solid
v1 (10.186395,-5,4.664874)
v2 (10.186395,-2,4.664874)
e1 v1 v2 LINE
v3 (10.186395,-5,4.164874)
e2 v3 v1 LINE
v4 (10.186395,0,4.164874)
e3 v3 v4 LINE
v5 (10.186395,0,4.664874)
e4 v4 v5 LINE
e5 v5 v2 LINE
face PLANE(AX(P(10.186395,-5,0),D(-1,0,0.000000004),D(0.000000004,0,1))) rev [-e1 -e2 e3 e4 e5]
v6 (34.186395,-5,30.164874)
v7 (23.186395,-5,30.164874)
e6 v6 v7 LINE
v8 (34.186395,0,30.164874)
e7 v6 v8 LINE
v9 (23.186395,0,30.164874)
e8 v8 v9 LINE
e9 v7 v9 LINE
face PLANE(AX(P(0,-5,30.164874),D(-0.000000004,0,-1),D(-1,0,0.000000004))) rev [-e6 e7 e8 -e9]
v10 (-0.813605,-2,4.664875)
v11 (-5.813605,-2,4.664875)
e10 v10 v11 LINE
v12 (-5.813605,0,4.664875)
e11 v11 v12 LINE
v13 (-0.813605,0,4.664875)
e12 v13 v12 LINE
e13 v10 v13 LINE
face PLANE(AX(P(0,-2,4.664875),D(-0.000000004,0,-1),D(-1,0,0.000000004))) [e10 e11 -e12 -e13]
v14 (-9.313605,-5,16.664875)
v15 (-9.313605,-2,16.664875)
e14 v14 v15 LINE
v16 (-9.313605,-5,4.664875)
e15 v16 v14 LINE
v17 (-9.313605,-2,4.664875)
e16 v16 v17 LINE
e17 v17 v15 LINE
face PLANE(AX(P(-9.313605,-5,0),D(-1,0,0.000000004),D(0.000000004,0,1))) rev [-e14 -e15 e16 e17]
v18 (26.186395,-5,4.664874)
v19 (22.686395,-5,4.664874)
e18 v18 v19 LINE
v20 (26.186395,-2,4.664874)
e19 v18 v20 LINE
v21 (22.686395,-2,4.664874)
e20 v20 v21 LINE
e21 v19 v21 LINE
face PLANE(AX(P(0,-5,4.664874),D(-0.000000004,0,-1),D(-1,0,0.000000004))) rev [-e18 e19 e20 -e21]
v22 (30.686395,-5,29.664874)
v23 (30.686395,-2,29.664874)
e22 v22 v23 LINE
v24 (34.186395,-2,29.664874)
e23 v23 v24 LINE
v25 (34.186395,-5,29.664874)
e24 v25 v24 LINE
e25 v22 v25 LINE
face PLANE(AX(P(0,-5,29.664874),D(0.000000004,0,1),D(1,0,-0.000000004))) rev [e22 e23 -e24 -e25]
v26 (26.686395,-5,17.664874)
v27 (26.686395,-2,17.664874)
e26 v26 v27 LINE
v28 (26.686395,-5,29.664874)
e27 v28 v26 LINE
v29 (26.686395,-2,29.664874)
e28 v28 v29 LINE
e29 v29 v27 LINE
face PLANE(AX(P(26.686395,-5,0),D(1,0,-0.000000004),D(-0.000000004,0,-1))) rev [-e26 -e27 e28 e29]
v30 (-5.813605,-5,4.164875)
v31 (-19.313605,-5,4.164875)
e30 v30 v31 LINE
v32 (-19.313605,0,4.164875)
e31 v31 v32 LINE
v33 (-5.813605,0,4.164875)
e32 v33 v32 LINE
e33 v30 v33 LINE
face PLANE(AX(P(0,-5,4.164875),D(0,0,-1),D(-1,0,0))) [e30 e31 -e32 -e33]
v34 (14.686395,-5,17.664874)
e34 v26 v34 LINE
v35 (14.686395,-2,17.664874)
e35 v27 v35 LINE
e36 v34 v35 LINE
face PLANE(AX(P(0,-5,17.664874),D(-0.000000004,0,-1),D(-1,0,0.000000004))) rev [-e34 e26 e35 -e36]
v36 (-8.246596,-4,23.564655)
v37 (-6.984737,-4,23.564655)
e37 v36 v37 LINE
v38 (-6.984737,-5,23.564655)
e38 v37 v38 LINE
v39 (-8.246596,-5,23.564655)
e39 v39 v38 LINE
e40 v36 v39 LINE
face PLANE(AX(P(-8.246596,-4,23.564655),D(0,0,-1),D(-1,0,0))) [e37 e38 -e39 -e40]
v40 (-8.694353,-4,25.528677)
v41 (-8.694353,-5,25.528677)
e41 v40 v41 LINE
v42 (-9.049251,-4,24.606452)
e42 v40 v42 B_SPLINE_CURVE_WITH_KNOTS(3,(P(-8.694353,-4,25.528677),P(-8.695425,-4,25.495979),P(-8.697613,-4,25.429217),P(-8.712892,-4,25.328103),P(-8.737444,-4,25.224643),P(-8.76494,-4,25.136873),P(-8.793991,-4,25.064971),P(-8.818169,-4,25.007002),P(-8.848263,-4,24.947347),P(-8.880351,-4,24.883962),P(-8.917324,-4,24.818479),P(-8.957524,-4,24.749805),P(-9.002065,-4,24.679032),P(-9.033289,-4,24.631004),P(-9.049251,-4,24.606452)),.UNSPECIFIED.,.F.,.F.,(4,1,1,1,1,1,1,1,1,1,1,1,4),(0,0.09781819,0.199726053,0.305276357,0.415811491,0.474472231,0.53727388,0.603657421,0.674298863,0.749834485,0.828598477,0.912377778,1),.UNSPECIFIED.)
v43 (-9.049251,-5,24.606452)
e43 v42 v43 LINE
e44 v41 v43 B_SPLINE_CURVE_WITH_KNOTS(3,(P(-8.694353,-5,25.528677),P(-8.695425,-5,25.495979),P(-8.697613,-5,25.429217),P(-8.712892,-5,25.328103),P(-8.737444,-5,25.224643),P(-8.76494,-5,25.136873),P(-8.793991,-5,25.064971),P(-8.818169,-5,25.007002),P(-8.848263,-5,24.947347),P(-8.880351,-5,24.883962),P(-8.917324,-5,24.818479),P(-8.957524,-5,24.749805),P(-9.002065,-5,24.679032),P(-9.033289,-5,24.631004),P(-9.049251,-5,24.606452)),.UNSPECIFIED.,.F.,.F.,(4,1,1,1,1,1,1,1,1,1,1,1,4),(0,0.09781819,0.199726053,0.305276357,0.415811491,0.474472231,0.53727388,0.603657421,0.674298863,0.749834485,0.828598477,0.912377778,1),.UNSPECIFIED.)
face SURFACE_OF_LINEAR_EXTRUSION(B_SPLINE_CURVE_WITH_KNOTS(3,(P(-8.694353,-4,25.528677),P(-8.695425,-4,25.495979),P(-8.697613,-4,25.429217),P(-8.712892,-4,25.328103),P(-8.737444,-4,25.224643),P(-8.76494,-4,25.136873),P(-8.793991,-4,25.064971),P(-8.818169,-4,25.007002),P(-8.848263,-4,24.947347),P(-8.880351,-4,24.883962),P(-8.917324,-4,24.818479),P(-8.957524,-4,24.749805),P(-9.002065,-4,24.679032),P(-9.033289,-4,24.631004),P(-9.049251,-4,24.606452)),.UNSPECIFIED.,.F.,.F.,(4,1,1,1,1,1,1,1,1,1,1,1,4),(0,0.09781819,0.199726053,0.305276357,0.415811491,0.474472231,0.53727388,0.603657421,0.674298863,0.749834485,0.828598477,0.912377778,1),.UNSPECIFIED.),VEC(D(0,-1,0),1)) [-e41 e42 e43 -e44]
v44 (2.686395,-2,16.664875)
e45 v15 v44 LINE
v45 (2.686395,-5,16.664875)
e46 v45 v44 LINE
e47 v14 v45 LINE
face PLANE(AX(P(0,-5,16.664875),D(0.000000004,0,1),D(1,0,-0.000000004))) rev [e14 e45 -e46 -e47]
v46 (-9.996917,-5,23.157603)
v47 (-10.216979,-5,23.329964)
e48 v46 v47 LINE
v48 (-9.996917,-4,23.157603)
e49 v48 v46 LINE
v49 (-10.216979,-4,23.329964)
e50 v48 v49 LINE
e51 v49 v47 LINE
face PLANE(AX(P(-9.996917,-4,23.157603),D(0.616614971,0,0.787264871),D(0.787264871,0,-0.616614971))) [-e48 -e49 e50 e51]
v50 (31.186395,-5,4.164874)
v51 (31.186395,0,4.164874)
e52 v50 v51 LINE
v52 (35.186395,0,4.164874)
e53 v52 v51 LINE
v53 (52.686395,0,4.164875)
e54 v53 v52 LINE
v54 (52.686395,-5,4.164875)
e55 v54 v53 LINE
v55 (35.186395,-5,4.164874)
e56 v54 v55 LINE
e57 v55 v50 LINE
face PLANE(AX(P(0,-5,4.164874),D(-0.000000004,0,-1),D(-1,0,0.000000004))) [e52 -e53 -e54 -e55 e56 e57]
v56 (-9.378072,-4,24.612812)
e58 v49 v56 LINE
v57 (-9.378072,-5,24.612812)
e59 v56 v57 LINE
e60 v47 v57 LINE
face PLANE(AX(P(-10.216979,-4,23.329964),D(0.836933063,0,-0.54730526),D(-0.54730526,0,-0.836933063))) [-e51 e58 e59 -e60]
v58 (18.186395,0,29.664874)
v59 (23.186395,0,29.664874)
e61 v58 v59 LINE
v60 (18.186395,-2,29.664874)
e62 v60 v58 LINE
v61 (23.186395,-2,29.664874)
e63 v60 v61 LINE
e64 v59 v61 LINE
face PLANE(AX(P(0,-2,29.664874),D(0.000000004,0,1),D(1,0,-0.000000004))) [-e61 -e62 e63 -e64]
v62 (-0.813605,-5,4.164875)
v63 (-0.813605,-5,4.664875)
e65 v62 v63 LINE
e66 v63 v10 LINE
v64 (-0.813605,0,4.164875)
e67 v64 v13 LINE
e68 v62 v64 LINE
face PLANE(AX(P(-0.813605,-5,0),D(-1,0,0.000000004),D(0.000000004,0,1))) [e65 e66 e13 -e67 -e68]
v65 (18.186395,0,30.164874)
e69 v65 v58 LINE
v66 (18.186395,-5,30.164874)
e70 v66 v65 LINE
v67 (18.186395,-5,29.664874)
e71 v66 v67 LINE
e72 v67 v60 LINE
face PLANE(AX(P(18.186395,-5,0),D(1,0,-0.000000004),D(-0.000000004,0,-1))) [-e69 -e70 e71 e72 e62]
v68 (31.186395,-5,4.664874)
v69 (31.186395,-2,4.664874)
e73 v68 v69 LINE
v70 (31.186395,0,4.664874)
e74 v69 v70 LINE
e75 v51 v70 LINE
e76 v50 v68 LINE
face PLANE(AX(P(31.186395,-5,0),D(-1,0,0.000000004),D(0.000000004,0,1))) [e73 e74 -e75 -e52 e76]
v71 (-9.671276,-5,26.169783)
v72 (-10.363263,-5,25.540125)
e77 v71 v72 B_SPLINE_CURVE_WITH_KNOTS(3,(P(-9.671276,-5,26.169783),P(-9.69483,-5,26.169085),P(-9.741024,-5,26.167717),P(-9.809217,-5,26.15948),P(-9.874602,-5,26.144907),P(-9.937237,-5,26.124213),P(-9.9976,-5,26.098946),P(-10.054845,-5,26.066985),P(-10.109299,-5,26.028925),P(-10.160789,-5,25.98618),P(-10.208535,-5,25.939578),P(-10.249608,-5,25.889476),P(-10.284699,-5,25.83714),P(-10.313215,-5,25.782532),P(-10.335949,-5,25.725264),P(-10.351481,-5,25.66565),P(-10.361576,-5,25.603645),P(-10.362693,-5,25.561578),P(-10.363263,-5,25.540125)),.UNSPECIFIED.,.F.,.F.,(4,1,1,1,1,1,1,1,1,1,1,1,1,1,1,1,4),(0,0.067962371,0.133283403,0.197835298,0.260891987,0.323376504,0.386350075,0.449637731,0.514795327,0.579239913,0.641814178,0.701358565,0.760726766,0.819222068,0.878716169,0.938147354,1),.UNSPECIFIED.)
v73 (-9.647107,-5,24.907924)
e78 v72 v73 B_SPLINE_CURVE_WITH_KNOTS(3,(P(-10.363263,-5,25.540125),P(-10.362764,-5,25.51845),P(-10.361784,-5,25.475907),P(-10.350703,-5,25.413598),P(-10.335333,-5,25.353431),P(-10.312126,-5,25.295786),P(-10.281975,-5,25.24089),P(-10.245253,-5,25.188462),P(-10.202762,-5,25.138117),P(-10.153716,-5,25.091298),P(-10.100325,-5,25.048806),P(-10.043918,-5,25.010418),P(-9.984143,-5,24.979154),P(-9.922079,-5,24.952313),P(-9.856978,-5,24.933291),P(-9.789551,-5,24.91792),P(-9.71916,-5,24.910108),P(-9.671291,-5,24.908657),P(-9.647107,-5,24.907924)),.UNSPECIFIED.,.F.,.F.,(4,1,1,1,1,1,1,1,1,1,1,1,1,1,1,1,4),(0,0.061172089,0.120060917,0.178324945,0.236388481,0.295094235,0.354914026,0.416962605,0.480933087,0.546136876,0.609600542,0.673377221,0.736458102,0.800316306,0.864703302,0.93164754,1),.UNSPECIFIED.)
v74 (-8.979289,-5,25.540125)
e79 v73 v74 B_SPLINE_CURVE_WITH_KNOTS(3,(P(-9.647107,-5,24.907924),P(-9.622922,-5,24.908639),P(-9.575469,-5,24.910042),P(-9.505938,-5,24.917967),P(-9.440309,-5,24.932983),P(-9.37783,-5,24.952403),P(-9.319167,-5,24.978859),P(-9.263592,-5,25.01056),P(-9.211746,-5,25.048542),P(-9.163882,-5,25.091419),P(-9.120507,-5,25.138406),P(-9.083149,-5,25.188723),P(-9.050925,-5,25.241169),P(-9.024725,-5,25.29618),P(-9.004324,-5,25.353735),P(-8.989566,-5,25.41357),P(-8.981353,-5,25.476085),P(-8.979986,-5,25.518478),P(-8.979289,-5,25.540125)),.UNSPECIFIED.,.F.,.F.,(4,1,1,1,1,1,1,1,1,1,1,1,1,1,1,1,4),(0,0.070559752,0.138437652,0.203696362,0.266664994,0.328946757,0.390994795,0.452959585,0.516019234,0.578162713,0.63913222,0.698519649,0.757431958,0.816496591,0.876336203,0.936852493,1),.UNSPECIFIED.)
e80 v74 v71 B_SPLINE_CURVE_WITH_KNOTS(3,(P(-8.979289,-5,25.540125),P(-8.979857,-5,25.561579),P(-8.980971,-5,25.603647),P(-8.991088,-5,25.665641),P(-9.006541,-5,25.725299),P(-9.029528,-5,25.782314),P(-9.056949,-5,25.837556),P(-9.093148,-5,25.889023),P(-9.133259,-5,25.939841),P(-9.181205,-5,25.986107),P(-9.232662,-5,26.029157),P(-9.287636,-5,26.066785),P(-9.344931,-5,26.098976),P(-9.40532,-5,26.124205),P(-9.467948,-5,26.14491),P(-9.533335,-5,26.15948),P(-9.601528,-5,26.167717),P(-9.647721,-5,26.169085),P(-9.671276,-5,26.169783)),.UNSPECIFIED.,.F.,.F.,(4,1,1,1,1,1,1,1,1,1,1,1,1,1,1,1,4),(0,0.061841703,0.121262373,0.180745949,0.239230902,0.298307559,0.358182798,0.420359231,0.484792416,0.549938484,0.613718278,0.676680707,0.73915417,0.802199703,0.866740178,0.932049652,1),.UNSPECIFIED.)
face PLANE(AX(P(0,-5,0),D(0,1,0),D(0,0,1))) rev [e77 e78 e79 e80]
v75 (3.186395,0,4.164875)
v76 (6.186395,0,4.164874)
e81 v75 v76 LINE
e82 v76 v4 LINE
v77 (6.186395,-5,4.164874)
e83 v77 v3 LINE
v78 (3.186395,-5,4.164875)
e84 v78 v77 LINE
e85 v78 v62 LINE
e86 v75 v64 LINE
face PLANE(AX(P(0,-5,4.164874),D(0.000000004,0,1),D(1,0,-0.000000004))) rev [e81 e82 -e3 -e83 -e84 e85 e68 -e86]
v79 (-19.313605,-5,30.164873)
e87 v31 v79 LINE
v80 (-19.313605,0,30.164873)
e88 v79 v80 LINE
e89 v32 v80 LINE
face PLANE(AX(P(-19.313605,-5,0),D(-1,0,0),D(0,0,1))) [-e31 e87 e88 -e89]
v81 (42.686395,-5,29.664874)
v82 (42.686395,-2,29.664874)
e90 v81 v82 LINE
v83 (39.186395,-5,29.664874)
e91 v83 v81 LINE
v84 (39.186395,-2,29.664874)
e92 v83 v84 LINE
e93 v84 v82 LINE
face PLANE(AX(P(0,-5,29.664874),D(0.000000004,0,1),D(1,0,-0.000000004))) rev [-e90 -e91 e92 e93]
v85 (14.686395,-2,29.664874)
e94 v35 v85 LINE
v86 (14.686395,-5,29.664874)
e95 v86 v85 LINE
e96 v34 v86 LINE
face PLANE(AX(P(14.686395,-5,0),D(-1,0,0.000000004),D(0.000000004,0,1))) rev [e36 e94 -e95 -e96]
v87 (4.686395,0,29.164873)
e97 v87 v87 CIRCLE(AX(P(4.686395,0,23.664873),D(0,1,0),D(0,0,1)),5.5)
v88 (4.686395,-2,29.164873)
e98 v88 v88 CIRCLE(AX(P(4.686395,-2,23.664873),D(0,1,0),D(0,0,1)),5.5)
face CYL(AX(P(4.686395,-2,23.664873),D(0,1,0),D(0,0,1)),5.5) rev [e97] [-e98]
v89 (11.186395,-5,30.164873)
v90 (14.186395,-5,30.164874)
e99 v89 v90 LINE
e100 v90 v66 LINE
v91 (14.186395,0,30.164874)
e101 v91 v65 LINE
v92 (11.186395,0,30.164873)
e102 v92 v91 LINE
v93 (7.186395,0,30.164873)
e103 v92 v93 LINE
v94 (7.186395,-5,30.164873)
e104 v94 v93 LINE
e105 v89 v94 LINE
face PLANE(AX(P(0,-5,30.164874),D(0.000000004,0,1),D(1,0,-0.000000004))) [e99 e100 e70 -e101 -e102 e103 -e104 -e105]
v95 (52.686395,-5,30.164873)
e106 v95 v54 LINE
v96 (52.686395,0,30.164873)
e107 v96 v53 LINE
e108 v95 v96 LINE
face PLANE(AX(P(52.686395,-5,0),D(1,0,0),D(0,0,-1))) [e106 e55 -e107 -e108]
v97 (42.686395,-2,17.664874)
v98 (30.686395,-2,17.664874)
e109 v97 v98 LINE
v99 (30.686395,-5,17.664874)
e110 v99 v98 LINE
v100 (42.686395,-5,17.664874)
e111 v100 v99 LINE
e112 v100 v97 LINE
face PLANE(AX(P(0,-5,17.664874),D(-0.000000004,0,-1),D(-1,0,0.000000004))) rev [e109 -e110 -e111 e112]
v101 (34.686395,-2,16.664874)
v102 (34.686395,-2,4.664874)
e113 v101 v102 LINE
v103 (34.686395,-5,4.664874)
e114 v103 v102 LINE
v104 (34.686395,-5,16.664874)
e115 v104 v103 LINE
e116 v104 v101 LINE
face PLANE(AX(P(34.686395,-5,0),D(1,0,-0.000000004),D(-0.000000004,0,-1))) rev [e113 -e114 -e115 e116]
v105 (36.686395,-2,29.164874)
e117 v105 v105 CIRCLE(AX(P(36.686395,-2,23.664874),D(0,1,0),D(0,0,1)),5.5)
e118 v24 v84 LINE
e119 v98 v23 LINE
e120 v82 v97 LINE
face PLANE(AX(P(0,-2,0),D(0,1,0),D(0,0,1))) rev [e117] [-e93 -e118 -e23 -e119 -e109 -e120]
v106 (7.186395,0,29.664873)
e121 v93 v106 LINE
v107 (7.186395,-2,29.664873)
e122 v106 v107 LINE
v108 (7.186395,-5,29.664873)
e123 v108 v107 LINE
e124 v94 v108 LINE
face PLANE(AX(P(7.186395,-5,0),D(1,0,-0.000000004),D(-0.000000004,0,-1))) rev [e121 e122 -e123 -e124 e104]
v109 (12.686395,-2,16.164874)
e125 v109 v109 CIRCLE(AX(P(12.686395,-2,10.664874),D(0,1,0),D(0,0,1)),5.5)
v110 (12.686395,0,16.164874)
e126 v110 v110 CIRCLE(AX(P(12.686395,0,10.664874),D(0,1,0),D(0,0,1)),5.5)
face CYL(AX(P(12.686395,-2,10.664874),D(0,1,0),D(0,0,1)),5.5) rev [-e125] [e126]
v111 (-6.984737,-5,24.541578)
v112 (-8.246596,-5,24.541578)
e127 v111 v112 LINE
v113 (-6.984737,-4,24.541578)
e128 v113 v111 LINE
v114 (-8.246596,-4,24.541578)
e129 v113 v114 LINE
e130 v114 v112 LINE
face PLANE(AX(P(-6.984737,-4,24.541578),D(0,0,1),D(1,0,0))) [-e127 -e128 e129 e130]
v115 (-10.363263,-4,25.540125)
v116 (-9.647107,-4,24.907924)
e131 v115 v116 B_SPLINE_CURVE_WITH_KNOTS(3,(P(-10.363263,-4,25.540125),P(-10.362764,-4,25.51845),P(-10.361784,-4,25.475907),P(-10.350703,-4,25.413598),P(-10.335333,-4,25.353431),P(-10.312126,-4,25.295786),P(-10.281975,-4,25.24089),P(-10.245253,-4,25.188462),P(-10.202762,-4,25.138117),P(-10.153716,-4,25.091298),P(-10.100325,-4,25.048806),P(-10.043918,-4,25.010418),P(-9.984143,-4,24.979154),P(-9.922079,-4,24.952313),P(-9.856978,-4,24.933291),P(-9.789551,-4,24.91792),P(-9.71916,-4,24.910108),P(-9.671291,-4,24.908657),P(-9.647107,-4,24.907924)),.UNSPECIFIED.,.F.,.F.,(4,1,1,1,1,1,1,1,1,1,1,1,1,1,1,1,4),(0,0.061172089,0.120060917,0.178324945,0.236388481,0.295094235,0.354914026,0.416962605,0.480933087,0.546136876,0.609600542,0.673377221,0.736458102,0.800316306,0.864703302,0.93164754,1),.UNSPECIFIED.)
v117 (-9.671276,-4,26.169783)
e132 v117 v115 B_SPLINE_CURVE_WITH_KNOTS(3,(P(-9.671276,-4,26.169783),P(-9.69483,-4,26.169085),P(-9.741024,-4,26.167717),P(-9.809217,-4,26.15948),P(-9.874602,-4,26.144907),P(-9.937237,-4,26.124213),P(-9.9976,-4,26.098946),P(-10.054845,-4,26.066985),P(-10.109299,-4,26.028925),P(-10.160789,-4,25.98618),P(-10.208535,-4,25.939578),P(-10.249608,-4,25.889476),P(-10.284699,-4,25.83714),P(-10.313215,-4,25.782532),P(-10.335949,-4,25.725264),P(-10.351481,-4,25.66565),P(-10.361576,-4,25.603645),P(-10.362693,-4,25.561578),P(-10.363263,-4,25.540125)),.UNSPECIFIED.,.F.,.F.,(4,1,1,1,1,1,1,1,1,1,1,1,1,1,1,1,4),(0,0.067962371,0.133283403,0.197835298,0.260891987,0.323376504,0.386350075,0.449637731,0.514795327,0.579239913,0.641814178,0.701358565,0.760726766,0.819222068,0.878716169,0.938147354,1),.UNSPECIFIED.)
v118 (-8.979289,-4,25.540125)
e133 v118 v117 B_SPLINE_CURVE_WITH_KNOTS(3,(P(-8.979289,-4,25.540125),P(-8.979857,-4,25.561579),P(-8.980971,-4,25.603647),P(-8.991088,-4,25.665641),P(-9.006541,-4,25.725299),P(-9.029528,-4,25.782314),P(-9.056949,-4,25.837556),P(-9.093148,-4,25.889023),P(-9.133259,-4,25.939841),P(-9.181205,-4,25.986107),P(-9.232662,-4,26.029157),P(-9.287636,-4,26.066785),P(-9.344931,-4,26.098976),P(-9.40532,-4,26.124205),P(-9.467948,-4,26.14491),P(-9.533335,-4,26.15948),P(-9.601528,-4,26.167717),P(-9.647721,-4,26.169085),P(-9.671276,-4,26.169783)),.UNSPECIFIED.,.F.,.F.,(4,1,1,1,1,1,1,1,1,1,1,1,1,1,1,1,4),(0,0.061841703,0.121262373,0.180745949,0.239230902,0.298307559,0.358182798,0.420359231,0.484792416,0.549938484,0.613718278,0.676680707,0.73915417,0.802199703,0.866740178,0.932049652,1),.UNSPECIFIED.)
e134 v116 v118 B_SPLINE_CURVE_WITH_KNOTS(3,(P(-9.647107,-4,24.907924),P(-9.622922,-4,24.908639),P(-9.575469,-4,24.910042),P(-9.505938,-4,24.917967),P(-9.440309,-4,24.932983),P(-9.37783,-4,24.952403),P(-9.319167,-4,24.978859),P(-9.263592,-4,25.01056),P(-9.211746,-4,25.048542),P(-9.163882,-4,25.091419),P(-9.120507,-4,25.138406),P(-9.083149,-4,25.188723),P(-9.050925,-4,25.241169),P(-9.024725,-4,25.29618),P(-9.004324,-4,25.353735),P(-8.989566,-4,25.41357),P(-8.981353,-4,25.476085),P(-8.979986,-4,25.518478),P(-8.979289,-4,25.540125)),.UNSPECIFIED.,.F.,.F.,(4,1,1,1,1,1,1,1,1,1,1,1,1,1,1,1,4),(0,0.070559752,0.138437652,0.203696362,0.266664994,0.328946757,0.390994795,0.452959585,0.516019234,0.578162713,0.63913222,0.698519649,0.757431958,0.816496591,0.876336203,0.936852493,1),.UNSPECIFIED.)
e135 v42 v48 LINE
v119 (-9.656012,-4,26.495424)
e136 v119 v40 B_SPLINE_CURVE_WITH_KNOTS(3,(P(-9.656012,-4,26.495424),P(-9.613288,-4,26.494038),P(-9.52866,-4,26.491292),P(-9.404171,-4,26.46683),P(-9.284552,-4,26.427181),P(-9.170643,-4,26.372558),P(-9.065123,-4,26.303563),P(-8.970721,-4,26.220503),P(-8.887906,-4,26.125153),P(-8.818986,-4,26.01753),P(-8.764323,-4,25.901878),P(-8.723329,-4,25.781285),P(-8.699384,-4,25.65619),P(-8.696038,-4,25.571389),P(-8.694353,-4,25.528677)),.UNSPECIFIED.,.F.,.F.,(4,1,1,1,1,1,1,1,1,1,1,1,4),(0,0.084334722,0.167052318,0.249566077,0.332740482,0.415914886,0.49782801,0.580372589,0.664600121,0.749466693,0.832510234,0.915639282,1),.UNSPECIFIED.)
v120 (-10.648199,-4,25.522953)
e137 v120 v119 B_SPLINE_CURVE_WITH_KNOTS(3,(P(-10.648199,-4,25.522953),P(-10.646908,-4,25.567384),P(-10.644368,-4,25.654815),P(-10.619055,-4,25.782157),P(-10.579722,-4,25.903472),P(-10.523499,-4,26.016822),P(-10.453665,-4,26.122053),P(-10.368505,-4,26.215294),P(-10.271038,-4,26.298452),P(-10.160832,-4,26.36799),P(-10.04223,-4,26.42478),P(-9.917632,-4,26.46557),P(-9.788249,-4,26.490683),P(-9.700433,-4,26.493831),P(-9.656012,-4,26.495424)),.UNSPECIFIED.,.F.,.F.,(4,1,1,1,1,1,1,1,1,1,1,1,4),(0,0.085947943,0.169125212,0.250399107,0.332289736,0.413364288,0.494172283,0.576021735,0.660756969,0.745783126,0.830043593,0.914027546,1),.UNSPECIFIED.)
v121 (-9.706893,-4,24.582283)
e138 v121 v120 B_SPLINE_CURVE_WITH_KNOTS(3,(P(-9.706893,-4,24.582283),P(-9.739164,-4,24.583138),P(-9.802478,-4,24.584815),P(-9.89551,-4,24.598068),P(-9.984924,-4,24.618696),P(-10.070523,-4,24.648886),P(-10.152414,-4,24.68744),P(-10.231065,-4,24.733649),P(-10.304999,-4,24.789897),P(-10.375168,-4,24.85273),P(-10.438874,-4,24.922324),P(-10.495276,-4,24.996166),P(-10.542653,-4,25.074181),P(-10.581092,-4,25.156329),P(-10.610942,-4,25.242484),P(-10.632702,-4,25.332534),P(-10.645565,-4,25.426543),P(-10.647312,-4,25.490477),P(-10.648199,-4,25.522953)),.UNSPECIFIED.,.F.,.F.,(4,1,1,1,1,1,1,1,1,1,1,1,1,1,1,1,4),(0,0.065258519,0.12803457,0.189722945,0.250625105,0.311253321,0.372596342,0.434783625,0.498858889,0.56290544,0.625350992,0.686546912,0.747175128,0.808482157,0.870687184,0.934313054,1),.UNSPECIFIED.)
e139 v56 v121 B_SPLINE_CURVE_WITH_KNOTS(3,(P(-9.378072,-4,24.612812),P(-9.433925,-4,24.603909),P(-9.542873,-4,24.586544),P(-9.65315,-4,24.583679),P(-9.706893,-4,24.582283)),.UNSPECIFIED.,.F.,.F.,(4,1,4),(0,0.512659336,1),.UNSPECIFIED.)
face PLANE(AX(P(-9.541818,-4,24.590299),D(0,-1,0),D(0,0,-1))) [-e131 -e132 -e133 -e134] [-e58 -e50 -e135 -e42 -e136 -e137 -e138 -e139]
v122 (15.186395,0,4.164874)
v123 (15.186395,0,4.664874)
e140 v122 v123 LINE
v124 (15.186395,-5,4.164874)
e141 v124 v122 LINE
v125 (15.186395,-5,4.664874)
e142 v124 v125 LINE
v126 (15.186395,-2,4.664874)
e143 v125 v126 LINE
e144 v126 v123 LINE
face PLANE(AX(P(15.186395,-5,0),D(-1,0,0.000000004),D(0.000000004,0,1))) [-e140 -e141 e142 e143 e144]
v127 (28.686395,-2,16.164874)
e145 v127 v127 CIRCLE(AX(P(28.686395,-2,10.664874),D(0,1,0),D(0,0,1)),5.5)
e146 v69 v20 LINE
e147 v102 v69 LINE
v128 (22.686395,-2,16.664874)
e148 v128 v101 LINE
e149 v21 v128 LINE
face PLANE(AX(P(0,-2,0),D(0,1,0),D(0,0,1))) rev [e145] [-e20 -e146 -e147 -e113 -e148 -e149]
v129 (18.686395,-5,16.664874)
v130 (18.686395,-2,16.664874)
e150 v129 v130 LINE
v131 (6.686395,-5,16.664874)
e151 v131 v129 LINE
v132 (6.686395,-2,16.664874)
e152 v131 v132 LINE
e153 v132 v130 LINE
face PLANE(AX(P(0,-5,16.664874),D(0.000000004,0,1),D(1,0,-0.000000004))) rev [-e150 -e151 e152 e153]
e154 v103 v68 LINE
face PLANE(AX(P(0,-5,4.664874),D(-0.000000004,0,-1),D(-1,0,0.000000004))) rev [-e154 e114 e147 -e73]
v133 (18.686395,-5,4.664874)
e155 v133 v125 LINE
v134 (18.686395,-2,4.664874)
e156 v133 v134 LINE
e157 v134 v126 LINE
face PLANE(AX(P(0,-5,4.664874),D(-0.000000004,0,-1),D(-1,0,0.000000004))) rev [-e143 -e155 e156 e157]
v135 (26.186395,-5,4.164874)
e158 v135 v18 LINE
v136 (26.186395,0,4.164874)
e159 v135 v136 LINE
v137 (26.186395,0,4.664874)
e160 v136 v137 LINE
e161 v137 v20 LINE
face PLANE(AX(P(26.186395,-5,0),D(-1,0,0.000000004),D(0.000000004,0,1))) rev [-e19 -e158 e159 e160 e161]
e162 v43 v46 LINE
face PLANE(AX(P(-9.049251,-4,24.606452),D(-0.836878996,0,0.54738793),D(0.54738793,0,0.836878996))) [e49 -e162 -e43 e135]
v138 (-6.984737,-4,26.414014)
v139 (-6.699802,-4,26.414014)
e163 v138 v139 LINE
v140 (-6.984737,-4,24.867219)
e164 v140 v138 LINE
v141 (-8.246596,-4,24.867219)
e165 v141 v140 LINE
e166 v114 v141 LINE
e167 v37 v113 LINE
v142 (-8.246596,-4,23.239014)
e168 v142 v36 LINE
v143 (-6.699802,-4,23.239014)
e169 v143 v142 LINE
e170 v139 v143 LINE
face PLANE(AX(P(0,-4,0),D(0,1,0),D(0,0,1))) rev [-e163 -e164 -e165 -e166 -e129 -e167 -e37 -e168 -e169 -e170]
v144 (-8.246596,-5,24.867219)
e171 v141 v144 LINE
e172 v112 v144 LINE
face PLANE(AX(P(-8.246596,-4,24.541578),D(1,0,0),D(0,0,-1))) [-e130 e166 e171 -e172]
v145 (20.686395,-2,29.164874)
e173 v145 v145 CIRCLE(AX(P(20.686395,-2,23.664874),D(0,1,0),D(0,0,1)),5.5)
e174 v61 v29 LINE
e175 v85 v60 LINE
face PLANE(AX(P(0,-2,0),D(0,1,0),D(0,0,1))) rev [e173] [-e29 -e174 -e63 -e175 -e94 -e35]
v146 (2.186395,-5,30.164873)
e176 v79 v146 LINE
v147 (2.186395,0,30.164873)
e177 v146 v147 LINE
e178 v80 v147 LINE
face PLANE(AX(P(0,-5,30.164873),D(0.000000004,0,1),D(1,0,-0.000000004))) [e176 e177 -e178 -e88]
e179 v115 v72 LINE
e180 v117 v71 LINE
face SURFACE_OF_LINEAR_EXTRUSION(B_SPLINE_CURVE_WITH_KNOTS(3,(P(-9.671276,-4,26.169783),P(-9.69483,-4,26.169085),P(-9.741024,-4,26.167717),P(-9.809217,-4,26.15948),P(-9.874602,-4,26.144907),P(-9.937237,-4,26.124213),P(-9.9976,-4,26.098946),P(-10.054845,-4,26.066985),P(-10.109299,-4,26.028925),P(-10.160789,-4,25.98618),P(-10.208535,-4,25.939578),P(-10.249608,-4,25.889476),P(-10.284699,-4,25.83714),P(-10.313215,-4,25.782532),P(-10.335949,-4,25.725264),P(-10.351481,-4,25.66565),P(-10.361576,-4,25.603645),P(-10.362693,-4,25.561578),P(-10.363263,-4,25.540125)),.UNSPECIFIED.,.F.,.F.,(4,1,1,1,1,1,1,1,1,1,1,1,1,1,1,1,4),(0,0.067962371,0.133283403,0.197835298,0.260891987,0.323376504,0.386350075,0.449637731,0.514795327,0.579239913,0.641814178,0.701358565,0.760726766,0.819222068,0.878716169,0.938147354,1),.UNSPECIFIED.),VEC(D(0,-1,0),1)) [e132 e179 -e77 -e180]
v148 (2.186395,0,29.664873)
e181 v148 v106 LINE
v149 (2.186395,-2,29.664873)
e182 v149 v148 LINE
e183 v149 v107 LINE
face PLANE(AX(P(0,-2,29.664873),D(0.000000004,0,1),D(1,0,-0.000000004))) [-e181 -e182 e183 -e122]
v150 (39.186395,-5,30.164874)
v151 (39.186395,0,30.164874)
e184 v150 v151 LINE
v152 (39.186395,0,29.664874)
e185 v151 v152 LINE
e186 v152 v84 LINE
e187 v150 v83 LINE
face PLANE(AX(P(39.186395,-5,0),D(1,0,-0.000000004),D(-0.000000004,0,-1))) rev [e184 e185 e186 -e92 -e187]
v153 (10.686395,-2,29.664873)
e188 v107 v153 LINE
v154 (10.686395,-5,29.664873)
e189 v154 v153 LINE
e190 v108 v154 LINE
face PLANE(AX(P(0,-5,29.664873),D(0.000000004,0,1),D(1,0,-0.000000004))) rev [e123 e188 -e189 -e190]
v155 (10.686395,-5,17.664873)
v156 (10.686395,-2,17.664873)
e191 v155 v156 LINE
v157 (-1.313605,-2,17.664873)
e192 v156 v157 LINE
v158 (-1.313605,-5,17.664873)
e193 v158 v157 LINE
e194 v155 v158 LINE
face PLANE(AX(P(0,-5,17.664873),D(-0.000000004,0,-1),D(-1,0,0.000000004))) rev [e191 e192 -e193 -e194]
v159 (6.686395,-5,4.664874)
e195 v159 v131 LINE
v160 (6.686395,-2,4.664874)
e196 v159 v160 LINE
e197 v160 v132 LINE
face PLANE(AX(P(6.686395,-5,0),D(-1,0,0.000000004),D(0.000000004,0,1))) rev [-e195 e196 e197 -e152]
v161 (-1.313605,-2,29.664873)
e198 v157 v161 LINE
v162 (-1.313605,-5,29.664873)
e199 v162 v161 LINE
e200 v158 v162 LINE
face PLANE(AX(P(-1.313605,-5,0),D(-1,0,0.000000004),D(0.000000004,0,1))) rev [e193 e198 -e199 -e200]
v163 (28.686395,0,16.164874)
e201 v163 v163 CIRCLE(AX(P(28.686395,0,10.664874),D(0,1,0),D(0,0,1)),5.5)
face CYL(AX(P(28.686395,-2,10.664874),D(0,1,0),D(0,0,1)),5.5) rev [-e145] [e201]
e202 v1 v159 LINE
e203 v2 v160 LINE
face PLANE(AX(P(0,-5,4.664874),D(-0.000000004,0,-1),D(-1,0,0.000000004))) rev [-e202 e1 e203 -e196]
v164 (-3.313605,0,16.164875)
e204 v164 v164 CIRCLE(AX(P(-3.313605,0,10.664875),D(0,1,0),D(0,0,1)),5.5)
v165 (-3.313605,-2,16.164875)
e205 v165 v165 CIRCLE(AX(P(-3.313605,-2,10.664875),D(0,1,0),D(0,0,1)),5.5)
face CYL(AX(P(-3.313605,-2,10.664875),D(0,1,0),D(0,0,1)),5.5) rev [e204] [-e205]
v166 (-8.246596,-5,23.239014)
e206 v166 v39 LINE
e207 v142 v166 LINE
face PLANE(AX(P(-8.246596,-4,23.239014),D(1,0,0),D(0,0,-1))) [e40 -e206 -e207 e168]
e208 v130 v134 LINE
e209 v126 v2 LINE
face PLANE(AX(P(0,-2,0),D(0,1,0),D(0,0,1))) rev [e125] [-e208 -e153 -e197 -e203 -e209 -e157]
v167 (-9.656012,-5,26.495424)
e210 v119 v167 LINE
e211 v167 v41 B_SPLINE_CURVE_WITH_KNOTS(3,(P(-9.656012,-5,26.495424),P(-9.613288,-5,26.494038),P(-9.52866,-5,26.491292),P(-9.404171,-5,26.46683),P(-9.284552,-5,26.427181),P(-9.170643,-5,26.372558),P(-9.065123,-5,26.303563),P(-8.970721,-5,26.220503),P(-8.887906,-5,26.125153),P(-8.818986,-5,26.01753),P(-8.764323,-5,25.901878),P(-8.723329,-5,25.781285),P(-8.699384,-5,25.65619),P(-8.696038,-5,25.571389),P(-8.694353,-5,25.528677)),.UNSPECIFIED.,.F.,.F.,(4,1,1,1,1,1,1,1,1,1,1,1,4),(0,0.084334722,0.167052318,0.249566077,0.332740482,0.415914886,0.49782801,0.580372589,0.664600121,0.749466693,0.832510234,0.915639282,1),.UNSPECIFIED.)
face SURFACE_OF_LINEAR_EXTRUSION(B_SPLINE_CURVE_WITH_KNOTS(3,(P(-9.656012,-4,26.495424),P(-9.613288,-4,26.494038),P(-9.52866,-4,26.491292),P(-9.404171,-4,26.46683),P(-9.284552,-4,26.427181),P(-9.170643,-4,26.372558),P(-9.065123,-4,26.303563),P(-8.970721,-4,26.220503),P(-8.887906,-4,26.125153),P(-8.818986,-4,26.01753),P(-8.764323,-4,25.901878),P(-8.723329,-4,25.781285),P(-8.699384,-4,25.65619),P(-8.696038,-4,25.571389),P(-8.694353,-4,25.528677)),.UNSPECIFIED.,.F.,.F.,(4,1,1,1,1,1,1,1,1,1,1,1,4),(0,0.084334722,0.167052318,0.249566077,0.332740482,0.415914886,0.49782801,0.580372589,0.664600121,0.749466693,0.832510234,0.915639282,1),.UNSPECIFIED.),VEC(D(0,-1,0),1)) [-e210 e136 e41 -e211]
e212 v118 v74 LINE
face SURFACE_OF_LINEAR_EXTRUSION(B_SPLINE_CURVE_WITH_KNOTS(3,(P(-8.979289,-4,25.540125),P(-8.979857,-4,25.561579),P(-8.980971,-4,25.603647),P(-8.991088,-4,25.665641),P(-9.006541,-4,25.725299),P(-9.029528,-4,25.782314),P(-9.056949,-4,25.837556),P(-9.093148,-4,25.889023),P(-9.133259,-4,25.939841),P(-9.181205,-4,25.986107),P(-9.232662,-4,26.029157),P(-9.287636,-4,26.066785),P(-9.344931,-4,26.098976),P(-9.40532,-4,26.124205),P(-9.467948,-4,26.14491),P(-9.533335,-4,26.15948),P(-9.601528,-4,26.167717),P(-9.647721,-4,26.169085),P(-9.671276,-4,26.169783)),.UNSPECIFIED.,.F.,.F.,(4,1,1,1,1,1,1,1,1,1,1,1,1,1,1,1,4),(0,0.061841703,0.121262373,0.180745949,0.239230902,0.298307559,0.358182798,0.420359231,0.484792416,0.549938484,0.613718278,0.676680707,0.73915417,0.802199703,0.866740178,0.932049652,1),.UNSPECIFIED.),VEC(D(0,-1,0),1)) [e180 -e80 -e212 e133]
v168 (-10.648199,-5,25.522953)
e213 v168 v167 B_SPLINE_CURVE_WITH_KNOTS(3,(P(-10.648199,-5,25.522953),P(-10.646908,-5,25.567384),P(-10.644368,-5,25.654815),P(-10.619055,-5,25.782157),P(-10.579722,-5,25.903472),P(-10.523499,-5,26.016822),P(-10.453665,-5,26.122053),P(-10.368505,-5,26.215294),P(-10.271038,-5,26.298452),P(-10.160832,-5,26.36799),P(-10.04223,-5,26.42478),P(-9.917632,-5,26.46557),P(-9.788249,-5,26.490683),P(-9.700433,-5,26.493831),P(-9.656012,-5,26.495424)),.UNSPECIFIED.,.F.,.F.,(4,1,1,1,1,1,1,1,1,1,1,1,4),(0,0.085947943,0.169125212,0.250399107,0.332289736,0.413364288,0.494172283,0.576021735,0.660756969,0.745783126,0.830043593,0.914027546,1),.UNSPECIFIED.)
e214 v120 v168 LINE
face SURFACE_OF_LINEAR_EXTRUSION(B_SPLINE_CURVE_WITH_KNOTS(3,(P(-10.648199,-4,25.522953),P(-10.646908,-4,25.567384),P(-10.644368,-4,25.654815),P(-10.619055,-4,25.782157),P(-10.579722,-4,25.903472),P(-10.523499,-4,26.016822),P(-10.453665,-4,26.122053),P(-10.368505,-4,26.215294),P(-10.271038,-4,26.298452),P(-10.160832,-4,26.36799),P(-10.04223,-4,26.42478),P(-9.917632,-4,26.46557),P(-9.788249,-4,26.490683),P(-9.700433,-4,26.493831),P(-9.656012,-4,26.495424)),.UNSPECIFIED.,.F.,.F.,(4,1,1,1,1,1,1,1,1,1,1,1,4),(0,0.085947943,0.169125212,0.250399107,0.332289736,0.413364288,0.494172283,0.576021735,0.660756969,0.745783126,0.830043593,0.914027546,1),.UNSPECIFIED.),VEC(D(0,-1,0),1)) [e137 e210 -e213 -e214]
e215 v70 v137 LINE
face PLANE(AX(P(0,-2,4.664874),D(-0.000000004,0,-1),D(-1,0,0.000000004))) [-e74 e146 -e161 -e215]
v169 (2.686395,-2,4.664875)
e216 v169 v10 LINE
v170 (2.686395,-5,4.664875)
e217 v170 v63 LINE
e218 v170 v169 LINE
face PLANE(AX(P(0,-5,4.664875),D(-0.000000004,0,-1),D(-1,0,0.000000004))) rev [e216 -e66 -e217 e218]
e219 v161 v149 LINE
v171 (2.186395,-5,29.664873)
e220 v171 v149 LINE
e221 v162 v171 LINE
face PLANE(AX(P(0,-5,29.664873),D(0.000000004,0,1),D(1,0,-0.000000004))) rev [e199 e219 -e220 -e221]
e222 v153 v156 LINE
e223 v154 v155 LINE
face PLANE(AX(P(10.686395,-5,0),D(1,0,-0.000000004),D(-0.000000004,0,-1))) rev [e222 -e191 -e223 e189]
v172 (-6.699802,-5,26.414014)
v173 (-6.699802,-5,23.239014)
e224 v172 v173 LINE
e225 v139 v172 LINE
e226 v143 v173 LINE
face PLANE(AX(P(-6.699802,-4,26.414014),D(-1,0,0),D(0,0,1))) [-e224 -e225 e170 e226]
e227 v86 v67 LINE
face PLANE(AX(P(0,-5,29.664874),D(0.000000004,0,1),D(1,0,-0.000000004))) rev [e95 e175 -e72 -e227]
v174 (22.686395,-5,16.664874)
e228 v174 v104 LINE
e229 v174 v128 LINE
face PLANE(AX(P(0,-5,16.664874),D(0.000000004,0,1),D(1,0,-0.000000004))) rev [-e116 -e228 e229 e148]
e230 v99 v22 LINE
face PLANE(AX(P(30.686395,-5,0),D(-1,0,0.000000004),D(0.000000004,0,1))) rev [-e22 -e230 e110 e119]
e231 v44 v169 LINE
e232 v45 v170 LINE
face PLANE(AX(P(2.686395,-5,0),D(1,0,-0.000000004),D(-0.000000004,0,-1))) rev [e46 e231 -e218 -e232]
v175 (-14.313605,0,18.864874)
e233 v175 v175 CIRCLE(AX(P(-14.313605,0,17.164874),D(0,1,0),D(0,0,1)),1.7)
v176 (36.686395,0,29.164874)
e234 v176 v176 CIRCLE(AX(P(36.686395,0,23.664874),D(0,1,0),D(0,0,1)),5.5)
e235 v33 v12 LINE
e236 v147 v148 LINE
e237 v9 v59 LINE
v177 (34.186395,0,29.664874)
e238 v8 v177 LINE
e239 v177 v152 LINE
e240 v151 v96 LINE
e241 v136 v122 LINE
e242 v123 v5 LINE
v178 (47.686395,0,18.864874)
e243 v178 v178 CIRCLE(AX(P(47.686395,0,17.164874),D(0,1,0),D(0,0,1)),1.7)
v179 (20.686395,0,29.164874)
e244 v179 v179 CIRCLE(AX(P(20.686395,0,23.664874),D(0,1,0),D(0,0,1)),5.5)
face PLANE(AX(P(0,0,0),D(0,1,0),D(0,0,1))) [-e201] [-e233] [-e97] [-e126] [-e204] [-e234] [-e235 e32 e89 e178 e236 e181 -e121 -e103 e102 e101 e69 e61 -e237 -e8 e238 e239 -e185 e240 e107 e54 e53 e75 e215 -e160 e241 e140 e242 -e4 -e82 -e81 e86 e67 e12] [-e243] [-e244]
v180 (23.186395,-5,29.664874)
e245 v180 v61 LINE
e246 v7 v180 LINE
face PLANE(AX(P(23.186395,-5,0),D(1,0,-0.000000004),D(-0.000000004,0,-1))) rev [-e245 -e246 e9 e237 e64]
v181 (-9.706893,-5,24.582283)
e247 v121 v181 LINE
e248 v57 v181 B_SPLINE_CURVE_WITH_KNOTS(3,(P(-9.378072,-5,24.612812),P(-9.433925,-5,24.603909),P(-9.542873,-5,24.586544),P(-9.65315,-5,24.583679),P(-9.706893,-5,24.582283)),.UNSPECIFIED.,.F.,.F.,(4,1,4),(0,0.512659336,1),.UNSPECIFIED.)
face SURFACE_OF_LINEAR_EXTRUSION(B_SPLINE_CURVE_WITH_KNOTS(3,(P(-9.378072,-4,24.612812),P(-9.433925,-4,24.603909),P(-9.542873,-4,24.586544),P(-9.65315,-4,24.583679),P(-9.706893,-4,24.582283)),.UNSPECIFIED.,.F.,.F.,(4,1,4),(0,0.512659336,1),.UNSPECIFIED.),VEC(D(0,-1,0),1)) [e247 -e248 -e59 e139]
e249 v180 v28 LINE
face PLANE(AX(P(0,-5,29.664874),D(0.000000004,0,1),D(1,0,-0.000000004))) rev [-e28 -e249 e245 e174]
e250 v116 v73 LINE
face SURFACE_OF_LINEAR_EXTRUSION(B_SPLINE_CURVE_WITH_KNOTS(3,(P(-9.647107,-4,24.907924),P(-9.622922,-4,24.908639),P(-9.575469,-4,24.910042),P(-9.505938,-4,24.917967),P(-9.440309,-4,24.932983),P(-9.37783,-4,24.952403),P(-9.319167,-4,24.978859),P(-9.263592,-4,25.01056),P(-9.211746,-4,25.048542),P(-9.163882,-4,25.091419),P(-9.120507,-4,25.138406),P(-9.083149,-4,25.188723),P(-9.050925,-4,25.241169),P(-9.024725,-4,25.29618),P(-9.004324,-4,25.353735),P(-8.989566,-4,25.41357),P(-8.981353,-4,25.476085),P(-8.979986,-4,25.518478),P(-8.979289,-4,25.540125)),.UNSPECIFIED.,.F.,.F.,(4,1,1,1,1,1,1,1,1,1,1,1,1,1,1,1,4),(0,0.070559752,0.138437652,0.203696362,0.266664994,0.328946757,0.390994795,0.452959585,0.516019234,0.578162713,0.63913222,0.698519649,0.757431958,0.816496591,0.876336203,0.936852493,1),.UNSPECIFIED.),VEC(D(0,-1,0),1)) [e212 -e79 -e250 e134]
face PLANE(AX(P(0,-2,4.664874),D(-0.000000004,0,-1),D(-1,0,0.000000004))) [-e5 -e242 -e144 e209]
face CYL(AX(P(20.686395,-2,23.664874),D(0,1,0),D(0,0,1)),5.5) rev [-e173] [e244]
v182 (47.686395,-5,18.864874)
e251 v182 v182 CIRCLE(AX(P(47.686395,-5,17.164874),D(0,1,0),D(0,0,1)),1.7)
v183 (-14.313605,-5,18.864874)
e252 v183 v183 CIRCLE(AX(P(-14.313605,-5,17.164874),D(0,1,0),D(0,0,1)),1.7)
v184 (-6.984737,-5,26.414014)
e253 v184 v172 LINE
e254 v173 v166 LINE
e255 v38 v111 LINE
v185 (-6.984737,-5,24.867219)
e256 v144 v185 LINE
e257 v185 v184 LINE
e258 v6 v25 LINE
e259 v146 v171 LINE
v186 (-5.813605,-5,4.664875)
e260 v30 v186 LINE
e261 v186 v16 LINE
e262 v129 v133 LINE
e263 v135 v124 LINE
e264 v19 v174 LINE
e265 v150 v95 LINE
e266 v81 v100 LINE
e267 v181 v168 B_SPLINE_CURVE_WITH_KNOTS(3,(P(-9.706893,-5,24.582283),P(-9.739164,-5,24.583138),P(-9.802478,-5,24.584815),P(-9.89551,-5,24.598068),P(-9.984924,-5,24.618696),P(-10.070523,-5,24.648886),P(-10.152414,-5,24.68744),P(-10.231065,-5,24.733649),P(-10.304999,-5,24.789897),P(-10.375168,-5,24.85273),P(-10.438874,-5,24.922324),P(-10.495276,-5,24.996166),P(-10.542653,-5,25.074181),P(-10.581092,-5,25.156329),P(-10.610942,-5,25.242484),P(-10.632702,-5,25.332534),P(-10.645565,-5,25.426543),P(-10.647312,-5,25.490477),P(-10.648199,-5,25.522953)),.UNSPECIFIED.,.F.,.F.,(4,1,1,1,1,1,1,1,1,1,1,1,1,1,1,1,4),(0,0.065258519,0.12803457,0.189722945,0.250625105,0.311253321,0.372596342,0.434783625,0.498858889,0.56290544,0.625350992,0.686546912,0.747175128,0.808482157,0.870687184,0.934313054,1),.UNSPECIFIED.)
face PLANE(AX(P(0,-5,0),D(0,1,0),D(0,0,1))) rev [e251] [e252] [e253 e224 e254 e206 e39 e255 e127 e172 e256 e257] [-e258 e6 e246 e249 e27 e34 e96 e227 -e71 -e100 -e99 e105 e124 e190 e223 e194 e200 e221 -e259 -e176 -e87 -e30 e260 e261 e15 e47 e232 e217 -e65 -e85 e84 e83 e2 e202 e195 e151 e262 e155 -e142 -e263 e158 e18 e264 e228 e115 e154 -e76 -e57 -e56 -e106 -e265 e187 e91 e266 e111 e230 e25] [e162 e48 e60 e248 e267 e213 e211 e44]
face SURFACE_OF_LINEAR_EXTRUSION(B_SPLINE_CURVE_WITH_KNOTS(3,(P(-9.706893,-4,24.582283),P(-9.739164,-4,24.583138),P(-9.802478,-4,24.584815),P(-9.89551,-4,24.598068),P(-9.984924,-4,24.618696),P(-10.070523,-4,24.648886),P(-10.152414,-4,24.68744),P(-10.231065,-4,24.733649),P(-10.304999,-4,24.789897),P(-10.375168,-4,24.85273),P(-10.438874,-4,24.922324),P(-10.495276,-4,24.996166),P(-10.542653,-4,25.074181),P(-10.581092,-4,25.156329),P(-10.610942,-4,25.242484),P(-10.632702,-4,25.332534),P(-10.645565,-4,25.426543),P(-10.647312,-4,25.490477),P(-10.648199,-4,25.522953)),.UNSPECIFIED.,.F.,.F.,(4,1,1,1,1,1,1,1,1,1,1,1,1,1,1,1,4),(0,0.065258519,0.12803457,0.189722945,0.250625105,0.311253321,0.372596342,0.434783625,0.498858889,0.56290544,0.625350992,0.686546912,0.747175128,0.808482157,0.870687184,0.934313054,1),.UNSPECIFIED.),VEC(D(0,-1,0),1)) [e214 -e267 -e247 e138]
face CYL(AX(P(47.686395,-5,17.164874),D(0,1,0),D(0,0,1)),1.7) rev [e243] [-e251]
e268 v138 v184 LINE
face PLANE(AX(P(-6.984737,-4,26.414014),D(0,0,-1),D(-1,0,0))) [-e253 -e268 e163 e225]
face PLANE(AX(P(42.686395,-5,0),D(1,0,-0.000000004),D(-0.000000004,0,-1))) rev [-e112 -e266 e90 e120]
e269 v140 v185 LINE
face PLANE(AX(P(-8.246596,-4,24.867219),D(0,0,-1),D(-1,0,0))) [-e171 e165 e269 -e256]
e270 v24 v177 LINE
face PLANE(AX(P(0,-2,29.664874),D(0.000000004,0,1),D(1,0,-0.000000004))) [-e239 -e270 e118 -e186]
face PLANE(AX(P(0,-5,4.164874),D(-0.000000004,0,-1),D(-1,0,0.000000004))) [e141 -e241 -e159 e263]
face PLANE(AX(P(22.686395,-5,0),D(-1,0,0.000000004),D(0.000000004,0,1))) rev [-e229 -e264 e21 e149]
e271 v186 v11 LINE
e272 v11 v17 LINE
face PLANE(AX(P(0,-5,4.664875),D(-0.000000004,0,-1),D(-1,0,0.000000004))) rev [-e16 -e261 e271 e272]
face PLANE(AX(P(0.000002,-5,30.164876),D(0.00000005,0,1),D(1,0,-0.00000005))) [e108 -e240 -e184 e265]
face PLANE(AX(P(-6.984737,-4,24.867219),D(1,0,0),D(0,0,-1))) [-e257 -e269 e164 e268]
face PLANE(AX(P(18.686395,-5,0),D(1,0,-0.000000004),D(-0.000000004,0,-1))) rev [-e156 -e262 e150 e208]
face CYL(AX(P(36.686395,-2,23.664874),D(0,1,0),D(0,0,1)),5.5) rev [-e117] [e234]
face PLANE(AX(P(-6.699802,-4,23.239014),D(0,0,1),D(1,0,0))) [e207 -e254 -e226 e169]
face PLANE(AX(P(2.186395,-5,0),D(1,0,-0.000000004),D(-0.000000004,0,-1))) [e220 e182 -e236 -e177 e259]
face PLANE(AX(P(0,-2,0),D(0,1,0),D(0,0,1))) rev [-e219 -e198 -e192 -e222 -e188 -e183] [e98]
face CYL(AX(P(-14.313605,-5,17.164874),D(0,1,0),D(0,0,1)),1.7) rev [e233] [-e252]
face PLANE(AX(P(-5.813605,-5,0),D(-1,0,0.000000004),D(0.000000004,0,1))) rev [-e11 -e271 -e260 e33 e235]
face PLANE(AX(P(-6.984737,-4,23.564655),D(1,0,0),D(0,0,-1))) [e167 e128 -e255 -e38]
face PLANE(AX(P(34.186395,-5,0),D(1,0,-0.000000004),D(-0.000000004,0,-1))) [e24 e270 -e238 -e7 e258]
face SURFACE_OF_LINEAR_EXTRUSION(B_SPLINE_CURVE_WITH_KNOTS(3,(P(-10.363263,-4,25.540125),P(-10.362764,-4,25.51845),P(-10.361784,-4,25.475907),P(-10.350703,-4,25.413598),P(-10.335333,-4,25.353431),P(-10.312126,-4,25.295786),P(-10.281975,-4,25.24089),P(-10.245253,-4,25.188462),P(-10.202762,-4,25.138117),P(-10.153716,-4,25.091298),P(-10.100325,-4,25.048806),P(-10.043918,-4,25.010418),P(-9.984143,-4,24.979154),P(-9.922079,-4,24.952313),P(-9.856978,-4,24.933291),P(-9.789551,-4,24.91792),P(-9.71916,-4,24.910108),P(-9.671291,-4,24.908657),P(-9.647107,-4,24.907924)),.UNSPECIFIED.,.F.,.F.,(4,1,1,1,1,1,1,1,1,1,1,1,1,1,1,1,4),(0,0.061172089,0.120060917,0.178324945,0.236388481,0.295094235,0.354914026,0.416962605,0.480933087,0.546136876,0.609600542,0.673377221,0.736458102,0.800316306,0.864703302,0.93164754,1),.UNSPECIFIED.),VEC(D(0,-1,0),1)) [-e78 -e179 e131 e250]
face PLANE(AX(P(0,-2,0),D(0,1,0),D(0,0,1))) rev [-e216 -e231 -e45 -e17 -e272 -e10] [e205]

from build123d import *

# Parameters (mm, degrees)
SKETCH1_R             = 5.5
BOSS_EXTRUDE1_DEPTH   = 2
BOSS_EXTRUDE1_2_DEPTH = 2
BOSS_EXTRUDE1_3_DEPTH = 2
BOSS_EXTRUDE1_4_DEPTH = 2
BOSS_EXTRUDE1_5_DEPTH = 2
BOSS_EXTRUDE1_6_DEPTH = 2
SKETCH1_3_R           = 1.7
BOSS_EXTRUDE2_DEPTH   = 5
CUT_EXTRUDE1_DEPTH    = 1


with BuildPart() as part:
    # Sketch1 → Boss-Extrude1 (new body)
    with BuildSketch(Plane(origin=(0, 0, 0), x_dir=(1, 0, 0), z_dir=(0, 1, 0))):
        Polygon((2.68639507, -4.66487452), (-9.31360493, -4.664874562), (-9.313604887, -16.664874562), (2.686395113, -16.66487452), align=None)
        with Locations((-3.313604908, -10.664874541)):
            Circle(SKETCH1_R, mode=Mode.SUBTRACT)
    extrude(amount=-BOSS_EXTRUDE1_DEPTH)



with BuildPart() as body_2:
    # Sketch1 → Boss-Extrude1 2 (new body)
    with BuildSketch(Plane(origin=(0, 0, 0), x_dir=(1, 0, 0), z_dir=(0, 1, 0))):
        Polygon((18.68639507, -4.664873819), (6.68639507, -4.664873862), (6.686395113, -16.664873862), (18.686395113, -16.664873819), align=None)
        with Locations((12.686395092, -10.66487384)):
            Circle(SKETCH1_R, mode=Mode.SUBTRACT)
    extrude(amount=-BOSS_EXTRUDE1_2_DEPTH)


with BuildPart() as body_3:
    # Sketch1 → Boss-Extrude1 3 (new body)
    with BuildSketch(Plane(origin=(0, 0, 0), x_dir=(1, 0, 0), z_dir=(0, 1, 0))):
        Polygon((-1.313604837, -29.664873456), (10.686395163, -29.664873413), (10.68639512, -17.664873413), (-1.31360488, -17.664873456), align=None)
        with Locations((4.686395141, -23.664873434)):
            Circle(SKETCH1_R, mode=Mode.SUBTRACT)
    extrude(amount=-BOSS_EXTRUDE1_3_DEPTH)


with BuildPart() as body_4:
    # Sketch1 → Boss-Extrude1 4 (new body)
    with BuildSketch(Plane(origin=(0, 0, 0), x_dir=(1, 0, 0), z_dir=(0, 1, 0))):
        Polygon((14.686395163, -29.664873833), (26.686395163, -29.664873791), (26.68639512, -17.664873791), (14.68639512, -17.664873833), align=None)
        with Locations((20.686395141, -23.664873812)):
            Circle(SKETCH1_R, mode=Mode.SUBTRACT)
    extrude(amount=-BOSS_EXTRUDE1_4_DEPTH)


with BuildPart() as body_5:
    # Sketch1 → Boss-Extrude1 5 (new body)
    with BuildSketch(Plane(origin=(0, 0, 0), x_dir=(1, 0, 0), z_dir=(0, 1, 0))):
        Polygon((34.68639507, -4.664873762), (22.68639507, -4.664873805), (22.686395113, -16.664873805), (34.686395113, -16.664873762), align=None)
        with Locations((28.686395092, -10.664873784)):
            Circle(SKETCH1_R, mode=Mode.SUBTRACT)
    extrude(amount=-BOSS_EXTRUDE1_5_DEPTH)


with BuildPart() as body_6:
    # Sketch1 → Boss-Extrude1 6 (new body)
    with BuildSketch(Plane(origin=(0, 0, 0), x_dir=(1, 0, 0), z_dir=(0, 1, 0))):
        Polygon((30.686395163, -29.664873979), (42.686395163, -29.664873936), (42.68639512, -17.664873936), (30.68639512, -17.664873979), align=None)
        with Locations((36.686395141, -23.664873958)):
            Circle(SKETCH1_R, mode=Mode.SUBTRACT)
    extrude(amount=-BOSS_EXTRUDE1_6_DEPTH)


with BuildPart() as part_1:
    add(part.part)

    add(body_2.part)  # Boss-Extrude2 merges body 2

    add(body_3.part)  # Boss-Extrude2 merges body 3

    add(body_4.part)  # Boss-Extrude2 merges body 4

    add(body_5.part)  # Boss-Extrude2 merges body 5

    add(body_6.part)  # Boss-Extrude2 merges body 6
    # Sketch1<3> → Boss-Extrude2 (add)
    with BuildSketch(Plane(origin=(0, 0, 0), x_dir=(1, 0, 0), z_dir=(0, 1, 0))):
        Polygon((6.186395002, -4.164873846), (3.186395002, -4.1648745), (-0.813604931, -4.164874532), (-0.81360493, -4.664874532), (2.68639507, -4.66487452), (2.686395113, -16.66487452), (-9.313604887, -16.664874562), (-9.31360493, -4.664874562), (-5.81360493, -4.66487455), (-5.813604931, -4.16487455), (-9.813604931, -4.164874564), (-19.313604998, -4.164874546), (-19.313604998, -30.16487344), (-1.813604902, -30.16487344), (2.186395164, -30.164873443), (2.186395163, -29.664873443), (-1.313604837, -29.664873456), (-1.31360488, -17.664873456), (10.68639512, -17.664873413), (10.686395163, -29.664873413), (7.186395163, -29.664873425), (7.186395164, -30.164873425), (11.186395164, -30.164873411), (14.186395098, -30.164873817), (18.186395164, -30.164873821), (18.186395163, -29.664873821), (14.686395163, -29.664873833), (14.68639512, -17.664873833), (26.68639512, -17.664873791), (26.686395163, -29.664873791), (23.186395163, -29.664873803), (23.186395164, -30.164873803), (27.186395164, -30.164873789), (30.186395098, -30.164873963), (34.186395164, -30.164873966), (34.186395163, -29.664873966), (30.686395163, -29.664873979), (30.68639512, -17.664873979), (42.68639512, -17.664873936), (42.686395163, -29.664873936), (39.186395163, -29.664873949), (39.186395164, -30.164873949), (43.186395164, -30.164873935), (52.686395098, -30.16487344), (52.686395098, -4.164874546), (35.186395002, -4.164873743), (31.186395069, -4.164873775), (31.18639507, -4.664873775), (34.68639507, -4.664873762), (34.686395113, -16.664873762), (22.686395113, -16.664873805), (22.68639507, -4.664873805), (26.18639507, -4.664873793), (26.186395069, -4.164873793), (22.186395069, -4.164873807), (19.186395002, -4.1648738), (15.186395069, -4.164873832), (15.18639507, -4.664873832), (18.68639507, -4.664873819), (18.686395113, -16.664873819), (6.686395113, -16.664873862), (6.68639507, -4.664873862), (10.18639507, -4.664873849), (10.186395069, -4.164873849), align=None)
        with Locations((-14.313604998, -17.164873993)):
            Circle(SKETCH1_3_R, mode=Mode.SUBTRACT)
        with Locations((47.686395098, -17.164873993)):
            Circle(SKETCH1_3_R, mode=Mode.SUBTRACT)
    extrude(amount=-BOSS_EXTRUDE2_DEPTH)

    # Sketch2 → Cut-Extrude1 (cut)
    # profile 1 of 2: a face of its own
    with BuildSketch(Plane(origin=(0, -5, 0), x_dir=(-1, 0, 0), z_dir=(0, -1, 0))):
        Polygon((6.699801581, -23.2390136), (8.246596453, -23.2390136), (8.246596453, -23.564654626), (6.984737478, -23.564654626), (6.984737478, -24.541577703), (8.246596453, -24.541577703), (8.246596453, -24.867218728), (6.984737478, -24.867218728), (6.984737478, -26.4140136), (6.699801581, -26.4140136), align=None)
    # profile 2 of 2: a face of its own
    with BuildSketch(Plane(origin=(0, -5, 0), x_dir=(-1, 0, 0), z_dir=(0, -1, 0))):
        with BuildLine():
            Line((9.996916965, -23.157603344), (10.216979065, -23.329964121))
            Line((10.216979065, -23.329964121), (9.378071813, -24.612811677))
            add(Edge.make_bspline(
                [(9.378071813, -24.612811677), (9.43392485, -24.603909103), (9.542872514, -24.586543627), (9.65315015, -24.583678919), (9.706892927, -24.582282831)],
                knots=[0, 0, 0, 0, 1.025318673, 2, 2, 2, 2], degree=3))
            add(Edge.make_bspline(
                [(9.706892927, -24.582282831), (9.739163887, -24.583137599), (9.802478203, -24.584814619), (9.895509725, -24.598067595), (9.984924431, -24.618695779), (10.070522851, -24.64888638), (10.152413619, -24.68743998), (10.231065003, -24.733649384), (10.30499899, -24.789897237), (10.375167554, -24.852730491), (10.438873565, -24.922323744), (10.49527613, -24.996166388), (10.542653291, -25.074181472), (10.581092491, -25.156329486), (10.610941917, -25.2424838), (10.632702138, -25.332534184), (10.645565054, -25.426542733), (10.647311749, -25.490476506), (10.648199017, -25.522952903)],
                knots=[0, 0, 0, 0, 1.044136307, 2.048553127, 3.035567123, 4.010001674, 4.980053131, 5.96154148, 6.956538004, 7.981742224, 9.006487041, 10.005615874, 10.984750588, 11.954802044, 12.935714515, 13.930994945, 14.949008866, 16, 16, 16, 16], degree=3))
            add(Edge.make_bspline(
                [(10.648199017, -25.522952903), (10.646908057, -25.567384491), (10.644367755, -25.654815343), (10.619055025, -25.782157069), (10.579721633, -25.903471565), (10.523499161, -26.016821942), (10.453665142, -26.122052845), (10.368504755, -26.215293946), (10.271038162, -26.298451765), (10.160832281, -26.36799027), (10.042229735, -26.42478018), (9.917631851, -26.465570078), (9.788248654, -26.49068294), (9.700433045, -26.493831272), (9.656011517, -26.495423856)],
                knots=[0, 0, 0, 0, 1.031375318, 2.029502543, 3.004789286, 3.987476834, 4.960371455, 5.9300674, 6.912260825, 7.929083631, 8.949397511, 9.960523116, 10.96833055, 12, 12, 12, 12], degree=3))
            add(Edge.make_bspline(
                [(9.656011517, -26.495423856), (9.613288081, -26.494037555), (9.528660436, -26.491291536), (9.404170686, -26.466829578), (9.284552092, -26.427180992), (9.170642725, -26.372558039), (9.065123312, -26.303562674), (8.970720913, -26.220502607), (8.887906232, -26.125153306), (8.818986397, -26.017529563), (8.764323119, -25.901877958), (8.723329401, -25.781284966), (8.699384238, -25.656189983), (8.69603819, -25.571389235), (8.694352863, -25.528677062)],
                knots=[0, 0, 0, 0, 1.012016664, 2.004627821, 2.994792927, 3.992885782, 4.990978636, 5.973936114, 6.964471063, 7.975201453, 8.993600317, 9.990122807, 10.98767138, 12, 12, 12, 12], degree=3))
            add(Edge.make_bspline(
                [(8.694352863, -25.528677062), (8.695424602, -25.495979475), (8.697612889, -25.429217252), (8.712892251, -25.328103455), (8.737443886, -25.224642831), (8.764939609, -25.136872955), (8.793991413, -25.064971432), (8.818169074, -25.007001837), (8.848262627, -24.947347149), (8.880351337, -24.883961779), (8.91732364, -24.818479279), (8.957524265, -24.749805236), (9.002064662, -24.679031831), (9.033288667, -24.631003882), (9.049250699, -24.606451501)],
                knots=[0, 0, 0, 0, 1.173818275, 2.396712641, 3.66331629, 4.989737886, 5.693666774, 6.447286557, 7.243889047, 8.091586357, 8.998013824, 9.943181721, 10.948533338, 12, 12, 12, 12], degree=3))
            Line((9.049250699, -24.606451501), (9.996916965, -23.157603344))
        make_face()
        with BuildLine():
            add(Edge.make_bspline(
                [(9.64710727, -24.907923856), (9.622921579, -24.908639019), (9.575469451, -24.910042162), (9.505937895, -24.917966716), (9.440309411, -24.932982832), (9.377830069, -24.952402516), (9.31916676, -24.978858553), (9.263592246, -25.010560401), (9.211746157, -25.048541998), (9.16388158, -25.091418934), (9.120507249, -25.138406483), (9.083148796, -25.188723076), (9.050925237, -25.241169384), (9.024725214, -25.296180139), (9.004323526, -25.353735218), (8.989565892, -25.413569669), (8.981352848, -25.476084793), (8.97998648, -25.518477849), (8.97928876, -25.540125379)],
                knots=[0, 0, 0, 0, 1.128956033, 2.215002439, 3.259141796, 4.2666399, 5.263148119, 6.255916712, 7.247353359, 8.256307737, 9.250603402, 10.226115518, 11.176314381, 12.118911324, 13.063945463, 14.021379252, 14.989639887, 16, 16, 16, 16], degree=3))
            add(Edge.make_bspline(
                [(8.97928876, -25.540125379), (8.97985696, -25.561579289), (8.980971114, -25.603647213), (8.991087861, -25.665640612), (9.006541115, -25.725298779), (9.029528474, -25.782314158), (9.056948579, -25.837555818), (9.093148409, -25.889022827), (9.133259351, -25.939841033), (9.181205419, -25.986106654), (9.232661612, -26.029156591), (9.28763556, -26.066785107), (9.344930667, -26.098976136), (9.405320457, -26.124204774), (9.467948134, -26.144909663), (9.533335493, -26.159479719), (9.601528012, -26.167717054), (9.647721485, -26.169085201), (9.67127594, -26.169782831)],
                knots=[0, 0, 0, 0, 0.989467248, 1.94019797, 2.891935182, 3.827694429, 4.772920941, 5.730924762, 6.725747692, 7.756678648, 8.79901574, 9.819492441, 10.826891316, 11.826466727, 12.835195252, 13.867842842, 14.912794438, 16, 16, 16, 16], degree=3))
            add(Edge.make_bspline(
                [(9.67127594, -26.169782831), (9.694830356, -26.169085146), (9.741023753, -26.167716892), (9.809216821, -26.159480335), (9.874602152, -26.144907404), (9.9372372, -26.124212963), (9.997599783, -26.09894576), (10.054844781, -26.066985375), (10.109298837, -26.028925183), (10.16078881, -25.986180223), (10.208535311, -25.939577707), (10.249608271, -25.889476459), (10.28469949, -25.837139854), (10.313214788, -25.782531768), (10.335948959, -25.725264304), (10.351480576, -25.665649848), (10.361576431, -25.603644795), (10.362693456, -25.561578473), (10.363263119, -25.540125379)],
                knots=[0, 0, 0, 0, 1.087397944, 2.132534446, 3.165364764, 4.174271784, 5.174024072, 6.181601208, 7.194203697, 8.236725232, 9.267838612, 10.269026844, 11.221737037, 12.171628256, 13.107553087, 14.05945871, 15.010357665, 16, 16, 16, 16], degree=3))
            add(Edge.make_bspline(
                [(10.363263119, -25.540125379), (10.362763924, -25.518449609), (10.361784167, -25.475907121), (10.350702565, -25.413597625), (10.335333378, -25.35343124), (10.31212604, -25.29578579), (10.28197527, -25.240889945), (10.245252874, -25.18846183), (10.202761835, -25.138117296), (10.153715725, -25.091298499), (10.100325283, -25.048806355), (10.043918117, -25.010417813), (9.98414317, -24.979153645), (9.922078942, -24.95231253), (9.856977887, -24.933290658), (9.789551091, -24.917919833), (9.719159645, -24.910108409), (9.671290808, -24.908657076), (9.64710727, -24.907923856)],
                knots=[0, 0, 0, 0, 0.978753431, 1.920974676, 2.853199117, 3.782215702, 4.721507756, 5.67862441, 6.671401678, 7.694929396, 8.738190014, 9.75360867, 10.774035531, 11.783329636, 12.805060902, 13.835252836, 14.906360638, 16, 16, 16, 16], degree=3))
        make_face(mode=Mode.SUBTRACT)
    extrude(amount=-CUT_EXTRUDE1_DEPTH, mode=Mode.SUBTRACT)


solid = part_1.part
